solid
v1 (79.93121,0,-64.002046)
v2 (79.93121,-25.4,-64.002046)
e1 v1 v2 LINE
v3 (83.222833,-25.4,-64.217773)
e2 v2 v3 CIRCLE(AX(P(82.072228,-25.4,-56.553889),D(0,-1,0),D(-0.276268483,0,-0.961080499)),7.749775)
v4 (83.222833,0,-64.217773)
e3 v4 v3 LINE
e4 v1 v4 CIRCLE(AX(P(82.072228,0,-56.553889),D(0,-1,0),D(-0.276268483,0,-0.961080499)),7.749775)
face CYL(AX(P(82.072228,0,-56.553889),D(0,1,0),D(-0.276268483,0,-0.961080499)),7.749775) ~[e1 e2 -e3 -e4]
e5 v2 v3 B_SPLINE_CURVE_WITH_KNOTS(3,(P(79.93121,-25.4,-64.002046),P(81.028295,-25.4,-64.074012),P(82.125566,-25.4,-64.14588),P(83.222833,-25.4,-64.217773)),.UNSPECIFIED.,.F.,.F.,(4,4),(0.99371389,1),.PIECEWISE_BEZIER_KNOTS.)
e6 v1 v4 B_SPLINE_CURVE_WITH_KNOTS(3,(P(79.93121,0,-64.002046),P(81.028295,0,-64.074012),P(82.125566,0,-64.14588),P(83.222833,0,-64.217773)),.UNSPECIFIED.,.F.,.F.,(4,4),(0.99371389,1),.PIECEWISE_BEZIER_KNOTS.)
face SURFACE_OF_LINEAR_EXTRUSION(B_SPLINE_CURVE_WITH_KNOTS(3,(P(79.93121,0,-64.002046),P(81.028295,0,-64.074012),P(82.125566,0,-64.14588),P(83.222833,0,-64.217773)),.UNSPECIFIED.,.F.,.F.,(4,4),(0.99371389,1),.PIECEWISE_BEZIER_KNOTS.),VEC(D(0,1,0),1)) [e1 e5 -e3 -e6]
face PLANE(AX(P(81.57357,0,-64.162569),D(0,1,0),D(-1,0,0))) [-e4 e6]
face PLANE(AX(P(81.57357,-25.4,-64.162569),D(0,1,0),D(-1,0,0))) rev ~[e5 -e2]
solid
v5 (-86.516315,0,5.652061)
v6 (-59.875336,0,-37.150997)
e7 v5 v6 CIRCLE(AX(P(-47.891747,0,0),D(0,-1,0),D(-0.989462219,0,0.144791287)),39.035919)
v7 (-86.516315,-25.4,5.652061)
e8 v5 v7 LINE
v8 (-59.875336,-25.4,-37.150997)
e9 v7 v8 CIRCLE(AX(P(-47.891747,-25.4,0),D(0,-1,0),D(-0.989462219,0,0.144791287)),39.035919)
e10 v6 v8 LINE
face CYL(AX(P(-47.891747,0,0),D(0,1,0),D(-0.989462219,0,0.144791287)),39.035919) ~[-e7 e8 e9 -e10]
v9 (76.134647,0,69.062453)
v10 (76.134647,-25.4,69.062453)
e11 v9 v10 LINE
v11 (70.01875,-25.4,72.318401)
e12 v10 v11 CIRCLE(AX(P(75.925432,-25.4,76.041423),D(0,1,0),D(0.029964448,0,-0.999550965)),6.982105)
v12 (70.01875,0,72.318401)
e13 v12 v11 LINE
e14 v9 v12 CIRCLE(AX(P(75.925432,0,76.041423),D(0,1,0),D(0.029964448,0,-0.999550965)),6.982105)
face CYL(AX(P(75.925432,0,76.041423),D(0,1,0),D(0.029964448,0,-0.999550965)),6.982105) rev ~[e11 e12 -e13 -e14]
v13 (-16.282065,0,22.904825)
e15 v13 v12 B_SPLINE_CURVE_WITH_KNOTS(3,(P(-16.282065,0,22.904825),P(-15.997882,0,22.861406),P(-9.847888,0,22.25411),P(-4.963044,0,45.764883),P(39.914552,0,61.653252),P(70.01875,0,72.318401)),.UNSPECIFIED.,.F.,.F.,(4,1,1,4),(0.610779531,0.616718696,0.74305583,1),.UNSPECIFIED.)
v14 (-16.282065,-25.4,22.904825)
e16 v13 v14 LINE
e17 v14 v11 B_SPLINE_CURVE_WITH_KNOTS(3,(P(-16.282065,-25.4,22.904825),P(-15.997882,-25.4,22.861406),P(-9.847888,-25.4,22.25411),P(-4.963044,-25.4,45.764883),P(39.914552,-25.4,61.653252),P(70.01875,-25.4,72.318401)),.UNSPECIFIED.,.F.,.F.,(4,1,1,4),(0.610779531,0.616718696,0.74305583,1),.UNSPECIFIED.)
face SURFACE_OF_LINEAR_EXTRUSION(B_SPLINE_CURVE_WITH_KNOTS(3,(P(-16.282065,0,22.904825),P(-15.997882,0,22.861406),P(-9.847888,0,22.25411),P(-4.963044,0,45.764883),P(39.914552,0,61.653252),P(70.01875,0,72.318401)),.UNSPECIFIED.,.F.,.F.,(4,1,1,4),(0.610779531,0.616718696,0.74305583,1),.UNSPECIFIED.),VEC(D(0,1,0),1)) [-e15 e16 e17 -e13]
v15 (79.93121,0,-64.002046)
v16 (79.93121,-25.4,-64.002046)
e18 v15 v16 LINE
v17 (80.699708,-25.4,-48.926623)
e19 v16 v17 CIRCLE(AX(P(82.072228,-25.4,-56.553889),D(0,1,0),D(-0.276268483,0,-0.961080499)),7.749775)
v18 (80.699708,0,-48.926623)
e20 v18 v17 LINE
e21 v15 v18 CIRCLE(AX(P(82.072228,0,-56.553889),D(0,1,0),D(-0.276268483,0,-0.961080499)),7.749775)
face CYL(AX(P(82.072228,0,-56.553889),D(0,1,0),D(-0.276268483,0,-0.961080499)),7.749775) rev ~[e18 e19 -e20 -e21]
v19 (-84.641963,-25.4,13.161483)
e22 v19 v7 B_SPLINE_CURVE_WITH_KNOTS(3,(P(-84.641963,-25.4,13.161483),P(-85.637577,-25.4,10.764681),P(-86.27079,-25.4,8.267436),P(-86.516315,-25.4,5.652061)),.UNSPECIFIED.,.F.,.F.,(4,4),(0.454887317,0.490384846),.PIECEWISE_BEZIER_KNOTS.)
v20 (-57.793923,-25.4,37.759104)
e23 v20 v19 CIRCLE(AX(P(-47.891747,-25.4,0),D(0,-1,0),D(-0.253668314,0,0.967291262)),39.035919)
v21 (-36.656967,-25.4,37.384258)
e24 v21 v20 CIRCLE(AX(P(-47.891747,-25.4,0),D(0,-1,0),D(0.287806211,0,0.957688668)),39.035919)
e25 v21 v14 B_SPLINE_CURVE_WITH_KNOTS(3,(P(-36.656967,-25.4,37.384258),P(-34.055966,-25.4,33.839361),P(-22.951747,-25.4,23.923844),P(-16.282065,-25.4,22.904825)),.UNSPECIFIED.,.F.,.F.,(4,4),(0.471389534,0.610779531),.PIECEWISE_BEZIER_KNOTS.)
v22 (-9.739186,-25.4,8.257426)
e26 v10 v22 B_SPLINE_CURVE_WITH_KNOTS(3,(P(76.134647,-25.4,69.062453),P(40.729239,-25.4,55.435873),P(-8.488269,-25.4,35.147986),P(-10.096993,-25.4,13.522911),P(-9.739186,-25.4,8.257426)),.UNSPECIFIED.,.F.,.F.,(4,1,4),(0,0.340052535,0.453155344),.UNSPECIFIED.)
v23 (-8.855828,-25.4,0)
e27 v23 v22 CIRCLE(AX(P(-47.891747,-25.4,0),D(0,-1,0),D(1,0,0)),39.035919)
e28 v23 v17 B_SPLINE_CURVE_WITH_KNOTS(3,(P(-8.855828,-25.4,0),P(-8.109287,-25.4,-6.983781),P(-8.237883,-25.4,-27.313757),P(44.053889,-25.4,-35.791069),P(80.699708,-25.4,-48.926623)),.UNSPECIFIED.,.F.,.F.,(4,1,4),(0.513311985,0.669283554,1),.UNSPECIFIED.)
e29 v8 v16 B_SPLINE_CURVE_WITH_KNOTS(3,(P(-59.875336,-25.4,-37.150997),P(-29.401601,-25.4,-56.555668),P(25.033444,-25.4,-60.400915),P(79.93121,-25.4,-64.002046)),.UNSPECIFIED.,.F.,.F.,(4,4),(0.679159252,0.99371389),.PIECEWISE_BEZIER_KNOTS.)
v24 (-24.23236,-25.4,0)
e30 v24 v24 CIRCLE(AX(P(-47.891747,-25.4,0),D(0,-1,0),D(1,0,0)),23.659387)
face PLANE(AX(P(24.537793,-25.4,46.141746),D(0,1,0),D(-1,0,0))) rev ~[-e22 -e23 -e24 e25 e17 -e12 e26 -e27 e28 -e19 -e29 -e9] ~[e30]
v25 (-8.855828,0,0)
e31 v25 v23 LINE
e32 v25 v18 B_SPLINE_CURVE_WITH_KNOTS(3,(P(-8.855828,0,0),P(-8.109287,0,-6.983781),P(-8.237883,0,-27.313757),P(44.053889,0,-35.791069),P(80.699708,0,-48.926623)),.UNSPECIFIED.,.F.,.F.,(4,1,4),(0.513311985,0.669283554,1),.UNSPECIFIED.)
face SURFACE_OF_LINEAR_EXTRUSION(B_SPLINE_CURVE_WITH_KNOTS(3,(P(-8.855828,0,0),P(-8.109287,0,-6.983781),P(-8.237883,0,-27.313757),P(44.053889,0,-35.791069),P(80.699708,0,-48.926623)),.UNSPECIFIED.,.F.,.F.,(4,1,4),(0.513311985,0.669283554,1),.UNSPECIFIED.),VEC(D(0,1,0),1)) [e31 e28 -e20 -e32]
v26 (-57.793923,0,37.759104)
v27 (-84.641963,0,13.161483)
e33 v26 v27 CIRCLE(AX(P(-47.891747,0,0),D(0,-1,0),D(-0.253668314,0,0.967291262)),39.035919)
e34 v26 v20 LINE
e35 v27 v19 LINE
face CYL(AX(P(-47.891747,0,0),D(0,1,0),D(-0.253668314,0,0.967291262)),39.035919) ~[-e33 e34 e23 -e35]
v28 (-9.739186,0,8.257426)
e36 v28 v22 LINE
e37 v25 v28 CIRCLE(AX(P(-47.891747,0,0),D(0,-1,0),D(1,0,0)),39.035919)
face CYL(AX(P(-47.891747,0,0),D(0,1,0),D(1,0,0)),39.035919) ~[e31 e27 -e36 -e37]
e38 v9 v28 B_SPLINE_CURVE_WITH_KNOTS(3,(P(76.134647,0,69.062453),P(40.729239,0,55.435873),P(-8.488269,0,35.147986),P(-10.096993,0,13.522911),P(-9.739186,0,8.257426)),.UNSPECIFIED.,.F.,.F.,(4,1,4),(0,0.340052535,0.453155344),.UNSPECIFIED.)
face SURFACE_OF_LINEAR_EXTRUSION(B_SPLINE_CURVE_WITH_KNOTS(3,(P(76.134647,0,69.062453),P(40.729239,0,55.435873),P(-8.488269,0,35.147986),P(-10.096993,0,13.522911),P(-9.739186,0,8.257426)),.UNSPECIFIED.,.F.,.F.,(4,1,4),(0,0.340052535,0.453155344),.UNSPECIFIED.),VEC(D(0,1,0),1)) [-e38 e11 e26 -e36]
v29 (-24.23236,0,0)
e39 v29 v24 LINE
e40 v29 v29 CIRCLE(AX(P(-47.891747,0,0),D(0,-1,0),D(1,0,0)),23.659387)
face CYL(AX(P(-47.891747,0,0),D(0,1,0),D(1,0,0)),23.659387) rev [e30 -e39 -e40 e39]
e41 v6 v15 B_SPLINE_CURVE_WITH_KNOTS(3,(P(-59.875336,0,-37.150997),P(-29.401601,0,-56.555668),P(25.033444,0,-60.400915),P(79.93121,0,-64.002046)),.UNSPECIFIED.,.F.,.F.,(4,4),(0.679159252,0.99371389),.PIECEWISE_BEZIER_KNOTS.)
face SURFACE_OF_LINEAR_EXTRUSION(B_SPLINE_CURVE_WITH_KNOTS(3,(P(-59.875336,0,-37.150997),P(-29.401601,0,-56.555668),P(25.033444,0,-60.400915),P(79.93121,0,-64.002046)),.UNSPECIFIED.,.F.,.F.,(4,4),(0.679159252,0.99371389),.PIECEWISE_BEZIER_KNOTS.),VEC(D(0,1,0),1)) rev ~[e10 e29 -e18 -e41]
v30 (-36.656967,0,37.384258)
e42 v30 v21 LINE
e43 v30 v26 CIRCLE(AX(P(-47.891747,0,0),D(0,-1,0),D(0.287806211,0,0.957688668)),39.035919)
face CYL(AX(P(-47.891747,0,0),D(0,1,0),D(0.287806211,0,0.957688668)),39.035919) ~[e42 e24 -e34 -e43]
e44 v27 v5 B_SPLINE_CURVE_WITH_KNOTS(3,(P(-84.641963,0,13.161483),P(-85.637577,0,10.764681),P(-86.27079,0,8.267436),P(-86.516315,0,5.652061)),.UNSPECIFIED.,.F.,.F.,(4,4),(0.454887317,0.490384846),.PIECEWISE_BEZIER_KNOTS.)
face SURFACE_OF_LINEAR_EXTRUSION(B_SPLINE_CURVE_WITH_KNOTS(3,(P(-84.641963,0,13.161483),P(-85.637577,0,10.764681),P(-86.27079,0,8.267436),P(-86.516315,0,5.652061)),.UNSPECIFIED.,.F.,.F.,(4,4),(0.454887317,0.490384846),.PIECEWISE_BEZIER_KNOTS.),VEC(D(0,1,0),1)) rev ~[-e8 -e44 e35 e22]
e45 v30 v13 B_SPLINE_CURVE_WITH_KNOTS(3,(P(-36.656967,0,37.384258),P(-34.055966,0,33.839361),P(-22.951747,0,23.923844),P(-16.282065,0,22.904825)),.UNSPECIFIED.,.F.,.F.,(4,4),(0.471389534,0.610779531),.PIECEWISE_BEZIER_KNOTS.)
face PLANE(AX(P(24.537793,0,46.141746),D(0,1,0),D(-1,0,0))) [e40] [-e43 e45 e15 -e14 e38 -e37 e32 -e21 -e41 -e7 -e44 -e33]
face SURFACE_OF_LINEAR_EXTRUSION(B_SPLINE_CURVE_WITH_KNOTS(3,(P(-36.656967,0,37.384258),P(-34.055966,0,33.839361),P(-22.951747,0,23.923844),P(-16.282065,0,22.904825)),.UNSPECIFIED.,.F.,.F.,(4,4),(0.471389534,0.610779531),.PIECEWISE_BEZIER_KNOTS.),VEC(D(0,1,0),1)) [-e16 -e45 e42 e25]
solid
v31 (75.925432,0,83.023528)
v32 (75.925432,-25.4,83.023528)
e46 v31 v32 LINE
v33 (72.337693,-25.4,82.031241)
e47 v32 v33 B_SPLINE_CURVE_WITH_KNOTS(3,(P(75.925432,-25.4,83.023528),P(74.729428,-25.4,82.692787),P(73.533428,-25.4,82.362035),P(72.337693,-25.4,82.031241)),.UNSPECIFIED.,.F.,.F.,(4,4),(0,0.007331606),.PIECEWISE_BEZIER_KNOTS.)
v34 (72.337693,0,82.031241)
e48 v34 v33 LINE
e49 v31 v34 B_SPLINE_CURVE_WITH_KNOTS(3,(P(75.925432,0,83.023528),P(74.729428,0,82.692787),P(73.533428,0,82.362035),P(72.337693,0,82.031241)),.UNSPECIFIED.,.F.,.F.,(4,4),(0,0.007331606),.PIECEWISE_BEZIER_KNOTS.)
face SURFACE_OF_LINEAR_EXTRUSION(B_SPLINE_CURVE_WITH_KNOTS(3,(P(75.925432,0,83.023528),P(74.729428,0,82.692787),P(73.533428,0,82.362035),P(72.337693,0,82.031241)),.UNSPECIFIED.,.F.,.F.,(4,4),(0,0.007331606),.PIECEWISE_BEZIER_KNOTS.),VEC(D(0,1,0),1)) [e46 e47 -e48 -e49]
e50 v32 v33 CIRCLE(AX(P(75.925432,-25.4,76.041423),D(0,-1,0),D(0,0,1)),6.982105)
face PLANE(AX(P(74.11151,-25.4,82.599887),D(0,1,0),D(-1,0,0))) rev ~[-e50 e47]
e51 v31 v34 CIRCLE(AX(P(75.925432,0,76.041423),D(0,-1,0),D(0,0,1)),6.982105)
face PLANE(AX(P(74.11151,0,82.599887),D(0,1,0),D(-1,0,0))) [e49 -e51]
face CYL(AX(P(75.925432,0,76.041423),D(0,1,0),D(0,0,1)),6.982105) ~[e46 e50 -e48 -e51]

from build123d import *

# Parameters (mm, degrees)
F1_DEPTH = 25.4
F0_R     = 23.6593869312


with BuildPart() as f1:
    # F0 (on Front) → F1 (new body)
    with BuildSketch(Plane.XZ):
        with BuildLine():
            add(Edge.make_bspline(
                [(75.9254321456, 83.0235277666), (74.7294280544, 82.6927874869), (73.5334280539, 82.3620352717), (72.3376928193, 82.0312405203)],
                knots=[0, 0, 0, 0, 0.0073316061, 0.0073316061, 0.0073316061, 0.0073316061], degree=3))
            ThreePointArc((75.9254321456, 83.0235277666), (74.0642156447, 82.7708851046), (72.3376928194, 82.0312405203))
        make_face()
    extrude(amount=F1_DEPTH)


with BuildPart() as f1b:
    # F0 (on Front) → F1, piece 2 (new body)
    with BuildSketch(Plane.XZ):
        with BuildLine():
            add(Edge.make_bspline(
                [(76.1346470657, 69.0624530107), (40.7292389403, 55.4358728105), (-8.4882690711, 35.1479862328), (-10.0969930291, 13.5229108802), (-9.7391861118, 8.2574256301)],
                knots=[0, 0, 0, 0, 0.3400525355, 0.4531553438, 0.4531553438, 0.4531553438, 0.4531553438], degree=3))
            ThreePointArc((76.1346470657, 69.0624530107), (72.6443374796, 69.8782898329), (70.0187498647, 72.3184005689))
            add(Edge.make_bspline(
                [(-16.28206518, 22.9048247821), (-15.9978816605, 22.8614061319), (-9.847888416, 22.2541104927), (-4.9630436623, 45.7648826483), (39.9145521125, 61.6532519518), (70.0187498647, 72.3184005689)],
                knots=[0.6107795309, 0.6107795309, 0.6107795309, 0.6107795309, 0.6167186955, 0.7430558298, 1, 1, 1, 1], degree=3))
            ThreePointArc((-16.28206518, 22.9048247821), (-12.2500691202, 15.9208598799), (-9.7391861118, 8.2574256301))
        make_face()
        with BuildLine():
            add(Edge.make_bspline(
                [(-9.7391861118, 8.2574256301), (-9.5488772889, 5.4568417072), (-9.1437609317, 2.6935729525), (-8.8558278998, 0)],
                knots=[0.4531553438, 0.4531553438, 0.4531553438, 0.4531553438, 0.513311985, 0.513311985, 0.513311985, 0.513311985], degree=3))
            ThreePointArc((-9.7391861118, 8.2574256301), (-12.2500691202, 15.9208598799), (-16.28206518, 22.9048247821))
            add(Edge.make_bspline(
                [(-36.6569671608, 37.3842575617), (-34.0559655004, 33.839361088), (-22.9517472418, 23.9238444403), (-16.28206518, 22.9048247821)],
                knots=[0.4713895345, 0.4713895345, 0.4713895345, 0.4713895345, 0.6107795309, 0.6107795309, 0.6107795309, 0.6107795309], degree=3))
            ThreePointArc((-36.6569671608, 37.3842575617), (-47.1995868952, 39.0297823491), (-57.7939230416, 37.7591036685))
            add(Edge.make_bspline(
                [(-57.7939230416, 37.7591036685), (-71.2879137352, 30.3920746047), (-80.7433533788, 22.546843239), (-84.6419629659, 13.1614831137)],
                knots=[0.3158866582, 0.3158866582, 0.3158866582, 0.3158866582, 0.4548873169, 0.4548873169, 0.4548873169, 0.4548873169], degree=3))
            ThreePointArc((-84.6419629659, 13.1614831137), (-85.7657136885, 9.453341157), (-86.5163145506, 5.6520610039))
            add(Edge.make_bspline(
                [(-86.5163145506, 5.6520610039), (-87.8220049343, -8.256393814), (-78.1636088875, -25.5056272441), (-59.8753358981, -37.1509972704)],
                knots=[0.4903848461, 0.4903848461, 0.4903848461, 0.4903848461, 0.6791592516, 0.6791592516, 0.6791592516, 0.6791592516], degree=3))
            ThreePointArc((-59.8753358981, -37.1509972704), (-24.9133595896, -31.5562465868), (-8.8558278998, 0))
        make_face()
        with Locations((-47.8917472064, 0)):
            Circle(F0_R, mode=Mode.SUBTRACT)
        with BuildLine():
            ThreePointArc((-8.8558278998, 0), (-9.0772956945, 4.1522704562), (-9.7391861118, 8.2574256301))
            add(Edge.make_bspline(
                [(-9.7391861118, 8.2574256301), (-9.5488772889, 5.4568417072), (-9.1437609317, 2.6935729525), (-8.8558278998, 0)],
                knots=[0.4531553438, 0.4531553438, 0.4531553438, 0.4531553438, 0.513311985, 0.513311985, 0.513311985, 0.513311985], degree=3))
        make_face()
        with BuildLine():
            add(Edge.make_bspline(
                [(-57.7939230416, 37.7591036685), (-71.2879137352, 30.3920746047), (-80.7433533788, 22.546843239), (-84.6419629659, 13.1614831137)],
                knots=[0.3158866582, 0.3158866582, 0.3158866582, 0.3158866582, 0.4548873169, 0.4548873169, 0.4548873169, 0.4548873169], degree=3))
            ThreePointArc((-57.7939230416, 37.7591036685), (-74.2616570397, 28.7824747286), (-84.6419629659, 13.1614831137))
        make_face()
        with BuildLine():
            add(Edge.make_bspline(
                [(-8.8558278998, 0), (-8.1092874361, -6.9837808721), (-8.2378825667, -27.3137566504), (44.0538892813, -35.7910694427), (80.699708097, -48.9266225955)],
                knots=[0.513311985, 0.513311985, 0.513311985, 0.513311985, 0.669283554, 1, 1, 1, 1], degree=3))
            ThreePointArc((-8.8558278998, 0), (-24.9133595896, -31.5562465868), (-59.8753358981, -37.1509972704))
            add(Edge.make_bspline(
                [(-59.8753358981, -37.1509972704), (-29.4016014528, -56.5556678974), (25.033443589, -60.4009148555), (79.9312097407, -64.0020462349)],
                knots=[0.6791592516, 0.6791592516, 0.6791592516, 0.6791592516, 0.9937138904, 0.9937138904, 0.9937138904, 0.9937138904], degree=3))
            ThreePointArc((79.9312097407, -64.0020462349), (74.3325035366, -56.1593418997), (80.699708097, -48.9266225955))
        make_face()
        with BuildLine():
            ThreePointArc((-86.5163145506, 5.6520610039), (-85.7657136885, 9.453341157), (-84.6419629659, 13.1614831137))
            add(Edge.make_bspline(
                [(-84.6419629659, 13.1614831137), (-85.637577009, 10.7646808353), (-86.2707898333, 8.2674355824), (-86.5163145506, 5.6520610039)],
                knots=[0.4548873169, 0.4548873169, 0.4548873169, 0.4548873169, 0.4903848461, 0.4903848461, 0.4903848461, 0.4903848461], degree=3))
        make_face()
        with BuildLine():
            ThreePointArc((-86.5163145506, 5.6520610039), (-81.0326858435, -20.6271952134), (-59.8753358981, -37.1509972704))
            add(Edge.make_bspline(
                [(-86.5163145506, 5.6520610039), (-87.8220049343, -8.256393814), (-78.1636088875, -25.5056272441), (-59.8753358981, -37.1509972704)],
                knots=[0.4903848461, 0.4903848461, 0.4903848461, 0.4903848461, 0.6791592516, 0.6791592516, 0.6791592516, 0.6791592516], degree=3))
        make_face()
    extrude(amount=F1_DEPTH)


with BuildPart() as f1c:
    # F0 (on Front) → F1, piece 3 (new body)
    with BuildSketch(Plane.XZ):
        with BuildLine():
            add(Edge.make_bspline(
                [(79.9312097407, -64.0020462349), (81.0282953659, -64.0740118129), (82.1255657864, -64.1458798992), (83.2228334599, -64.2177727256)],
                knots=[0.9937138904, 0.9937138904, 0.9937138904, 0.9937138904, 1, 1, 1, 1], degree=3))
            ThreePointArc((79.9312097407, -64.0020462349), (81.5654106231, -64.2870734798), (83.2228334599, -64.2177727256))
        make_face()
    extrude(amount=F1_DEPTH)


solid = Compound([f1.part, f1b.part, f1c.part])
